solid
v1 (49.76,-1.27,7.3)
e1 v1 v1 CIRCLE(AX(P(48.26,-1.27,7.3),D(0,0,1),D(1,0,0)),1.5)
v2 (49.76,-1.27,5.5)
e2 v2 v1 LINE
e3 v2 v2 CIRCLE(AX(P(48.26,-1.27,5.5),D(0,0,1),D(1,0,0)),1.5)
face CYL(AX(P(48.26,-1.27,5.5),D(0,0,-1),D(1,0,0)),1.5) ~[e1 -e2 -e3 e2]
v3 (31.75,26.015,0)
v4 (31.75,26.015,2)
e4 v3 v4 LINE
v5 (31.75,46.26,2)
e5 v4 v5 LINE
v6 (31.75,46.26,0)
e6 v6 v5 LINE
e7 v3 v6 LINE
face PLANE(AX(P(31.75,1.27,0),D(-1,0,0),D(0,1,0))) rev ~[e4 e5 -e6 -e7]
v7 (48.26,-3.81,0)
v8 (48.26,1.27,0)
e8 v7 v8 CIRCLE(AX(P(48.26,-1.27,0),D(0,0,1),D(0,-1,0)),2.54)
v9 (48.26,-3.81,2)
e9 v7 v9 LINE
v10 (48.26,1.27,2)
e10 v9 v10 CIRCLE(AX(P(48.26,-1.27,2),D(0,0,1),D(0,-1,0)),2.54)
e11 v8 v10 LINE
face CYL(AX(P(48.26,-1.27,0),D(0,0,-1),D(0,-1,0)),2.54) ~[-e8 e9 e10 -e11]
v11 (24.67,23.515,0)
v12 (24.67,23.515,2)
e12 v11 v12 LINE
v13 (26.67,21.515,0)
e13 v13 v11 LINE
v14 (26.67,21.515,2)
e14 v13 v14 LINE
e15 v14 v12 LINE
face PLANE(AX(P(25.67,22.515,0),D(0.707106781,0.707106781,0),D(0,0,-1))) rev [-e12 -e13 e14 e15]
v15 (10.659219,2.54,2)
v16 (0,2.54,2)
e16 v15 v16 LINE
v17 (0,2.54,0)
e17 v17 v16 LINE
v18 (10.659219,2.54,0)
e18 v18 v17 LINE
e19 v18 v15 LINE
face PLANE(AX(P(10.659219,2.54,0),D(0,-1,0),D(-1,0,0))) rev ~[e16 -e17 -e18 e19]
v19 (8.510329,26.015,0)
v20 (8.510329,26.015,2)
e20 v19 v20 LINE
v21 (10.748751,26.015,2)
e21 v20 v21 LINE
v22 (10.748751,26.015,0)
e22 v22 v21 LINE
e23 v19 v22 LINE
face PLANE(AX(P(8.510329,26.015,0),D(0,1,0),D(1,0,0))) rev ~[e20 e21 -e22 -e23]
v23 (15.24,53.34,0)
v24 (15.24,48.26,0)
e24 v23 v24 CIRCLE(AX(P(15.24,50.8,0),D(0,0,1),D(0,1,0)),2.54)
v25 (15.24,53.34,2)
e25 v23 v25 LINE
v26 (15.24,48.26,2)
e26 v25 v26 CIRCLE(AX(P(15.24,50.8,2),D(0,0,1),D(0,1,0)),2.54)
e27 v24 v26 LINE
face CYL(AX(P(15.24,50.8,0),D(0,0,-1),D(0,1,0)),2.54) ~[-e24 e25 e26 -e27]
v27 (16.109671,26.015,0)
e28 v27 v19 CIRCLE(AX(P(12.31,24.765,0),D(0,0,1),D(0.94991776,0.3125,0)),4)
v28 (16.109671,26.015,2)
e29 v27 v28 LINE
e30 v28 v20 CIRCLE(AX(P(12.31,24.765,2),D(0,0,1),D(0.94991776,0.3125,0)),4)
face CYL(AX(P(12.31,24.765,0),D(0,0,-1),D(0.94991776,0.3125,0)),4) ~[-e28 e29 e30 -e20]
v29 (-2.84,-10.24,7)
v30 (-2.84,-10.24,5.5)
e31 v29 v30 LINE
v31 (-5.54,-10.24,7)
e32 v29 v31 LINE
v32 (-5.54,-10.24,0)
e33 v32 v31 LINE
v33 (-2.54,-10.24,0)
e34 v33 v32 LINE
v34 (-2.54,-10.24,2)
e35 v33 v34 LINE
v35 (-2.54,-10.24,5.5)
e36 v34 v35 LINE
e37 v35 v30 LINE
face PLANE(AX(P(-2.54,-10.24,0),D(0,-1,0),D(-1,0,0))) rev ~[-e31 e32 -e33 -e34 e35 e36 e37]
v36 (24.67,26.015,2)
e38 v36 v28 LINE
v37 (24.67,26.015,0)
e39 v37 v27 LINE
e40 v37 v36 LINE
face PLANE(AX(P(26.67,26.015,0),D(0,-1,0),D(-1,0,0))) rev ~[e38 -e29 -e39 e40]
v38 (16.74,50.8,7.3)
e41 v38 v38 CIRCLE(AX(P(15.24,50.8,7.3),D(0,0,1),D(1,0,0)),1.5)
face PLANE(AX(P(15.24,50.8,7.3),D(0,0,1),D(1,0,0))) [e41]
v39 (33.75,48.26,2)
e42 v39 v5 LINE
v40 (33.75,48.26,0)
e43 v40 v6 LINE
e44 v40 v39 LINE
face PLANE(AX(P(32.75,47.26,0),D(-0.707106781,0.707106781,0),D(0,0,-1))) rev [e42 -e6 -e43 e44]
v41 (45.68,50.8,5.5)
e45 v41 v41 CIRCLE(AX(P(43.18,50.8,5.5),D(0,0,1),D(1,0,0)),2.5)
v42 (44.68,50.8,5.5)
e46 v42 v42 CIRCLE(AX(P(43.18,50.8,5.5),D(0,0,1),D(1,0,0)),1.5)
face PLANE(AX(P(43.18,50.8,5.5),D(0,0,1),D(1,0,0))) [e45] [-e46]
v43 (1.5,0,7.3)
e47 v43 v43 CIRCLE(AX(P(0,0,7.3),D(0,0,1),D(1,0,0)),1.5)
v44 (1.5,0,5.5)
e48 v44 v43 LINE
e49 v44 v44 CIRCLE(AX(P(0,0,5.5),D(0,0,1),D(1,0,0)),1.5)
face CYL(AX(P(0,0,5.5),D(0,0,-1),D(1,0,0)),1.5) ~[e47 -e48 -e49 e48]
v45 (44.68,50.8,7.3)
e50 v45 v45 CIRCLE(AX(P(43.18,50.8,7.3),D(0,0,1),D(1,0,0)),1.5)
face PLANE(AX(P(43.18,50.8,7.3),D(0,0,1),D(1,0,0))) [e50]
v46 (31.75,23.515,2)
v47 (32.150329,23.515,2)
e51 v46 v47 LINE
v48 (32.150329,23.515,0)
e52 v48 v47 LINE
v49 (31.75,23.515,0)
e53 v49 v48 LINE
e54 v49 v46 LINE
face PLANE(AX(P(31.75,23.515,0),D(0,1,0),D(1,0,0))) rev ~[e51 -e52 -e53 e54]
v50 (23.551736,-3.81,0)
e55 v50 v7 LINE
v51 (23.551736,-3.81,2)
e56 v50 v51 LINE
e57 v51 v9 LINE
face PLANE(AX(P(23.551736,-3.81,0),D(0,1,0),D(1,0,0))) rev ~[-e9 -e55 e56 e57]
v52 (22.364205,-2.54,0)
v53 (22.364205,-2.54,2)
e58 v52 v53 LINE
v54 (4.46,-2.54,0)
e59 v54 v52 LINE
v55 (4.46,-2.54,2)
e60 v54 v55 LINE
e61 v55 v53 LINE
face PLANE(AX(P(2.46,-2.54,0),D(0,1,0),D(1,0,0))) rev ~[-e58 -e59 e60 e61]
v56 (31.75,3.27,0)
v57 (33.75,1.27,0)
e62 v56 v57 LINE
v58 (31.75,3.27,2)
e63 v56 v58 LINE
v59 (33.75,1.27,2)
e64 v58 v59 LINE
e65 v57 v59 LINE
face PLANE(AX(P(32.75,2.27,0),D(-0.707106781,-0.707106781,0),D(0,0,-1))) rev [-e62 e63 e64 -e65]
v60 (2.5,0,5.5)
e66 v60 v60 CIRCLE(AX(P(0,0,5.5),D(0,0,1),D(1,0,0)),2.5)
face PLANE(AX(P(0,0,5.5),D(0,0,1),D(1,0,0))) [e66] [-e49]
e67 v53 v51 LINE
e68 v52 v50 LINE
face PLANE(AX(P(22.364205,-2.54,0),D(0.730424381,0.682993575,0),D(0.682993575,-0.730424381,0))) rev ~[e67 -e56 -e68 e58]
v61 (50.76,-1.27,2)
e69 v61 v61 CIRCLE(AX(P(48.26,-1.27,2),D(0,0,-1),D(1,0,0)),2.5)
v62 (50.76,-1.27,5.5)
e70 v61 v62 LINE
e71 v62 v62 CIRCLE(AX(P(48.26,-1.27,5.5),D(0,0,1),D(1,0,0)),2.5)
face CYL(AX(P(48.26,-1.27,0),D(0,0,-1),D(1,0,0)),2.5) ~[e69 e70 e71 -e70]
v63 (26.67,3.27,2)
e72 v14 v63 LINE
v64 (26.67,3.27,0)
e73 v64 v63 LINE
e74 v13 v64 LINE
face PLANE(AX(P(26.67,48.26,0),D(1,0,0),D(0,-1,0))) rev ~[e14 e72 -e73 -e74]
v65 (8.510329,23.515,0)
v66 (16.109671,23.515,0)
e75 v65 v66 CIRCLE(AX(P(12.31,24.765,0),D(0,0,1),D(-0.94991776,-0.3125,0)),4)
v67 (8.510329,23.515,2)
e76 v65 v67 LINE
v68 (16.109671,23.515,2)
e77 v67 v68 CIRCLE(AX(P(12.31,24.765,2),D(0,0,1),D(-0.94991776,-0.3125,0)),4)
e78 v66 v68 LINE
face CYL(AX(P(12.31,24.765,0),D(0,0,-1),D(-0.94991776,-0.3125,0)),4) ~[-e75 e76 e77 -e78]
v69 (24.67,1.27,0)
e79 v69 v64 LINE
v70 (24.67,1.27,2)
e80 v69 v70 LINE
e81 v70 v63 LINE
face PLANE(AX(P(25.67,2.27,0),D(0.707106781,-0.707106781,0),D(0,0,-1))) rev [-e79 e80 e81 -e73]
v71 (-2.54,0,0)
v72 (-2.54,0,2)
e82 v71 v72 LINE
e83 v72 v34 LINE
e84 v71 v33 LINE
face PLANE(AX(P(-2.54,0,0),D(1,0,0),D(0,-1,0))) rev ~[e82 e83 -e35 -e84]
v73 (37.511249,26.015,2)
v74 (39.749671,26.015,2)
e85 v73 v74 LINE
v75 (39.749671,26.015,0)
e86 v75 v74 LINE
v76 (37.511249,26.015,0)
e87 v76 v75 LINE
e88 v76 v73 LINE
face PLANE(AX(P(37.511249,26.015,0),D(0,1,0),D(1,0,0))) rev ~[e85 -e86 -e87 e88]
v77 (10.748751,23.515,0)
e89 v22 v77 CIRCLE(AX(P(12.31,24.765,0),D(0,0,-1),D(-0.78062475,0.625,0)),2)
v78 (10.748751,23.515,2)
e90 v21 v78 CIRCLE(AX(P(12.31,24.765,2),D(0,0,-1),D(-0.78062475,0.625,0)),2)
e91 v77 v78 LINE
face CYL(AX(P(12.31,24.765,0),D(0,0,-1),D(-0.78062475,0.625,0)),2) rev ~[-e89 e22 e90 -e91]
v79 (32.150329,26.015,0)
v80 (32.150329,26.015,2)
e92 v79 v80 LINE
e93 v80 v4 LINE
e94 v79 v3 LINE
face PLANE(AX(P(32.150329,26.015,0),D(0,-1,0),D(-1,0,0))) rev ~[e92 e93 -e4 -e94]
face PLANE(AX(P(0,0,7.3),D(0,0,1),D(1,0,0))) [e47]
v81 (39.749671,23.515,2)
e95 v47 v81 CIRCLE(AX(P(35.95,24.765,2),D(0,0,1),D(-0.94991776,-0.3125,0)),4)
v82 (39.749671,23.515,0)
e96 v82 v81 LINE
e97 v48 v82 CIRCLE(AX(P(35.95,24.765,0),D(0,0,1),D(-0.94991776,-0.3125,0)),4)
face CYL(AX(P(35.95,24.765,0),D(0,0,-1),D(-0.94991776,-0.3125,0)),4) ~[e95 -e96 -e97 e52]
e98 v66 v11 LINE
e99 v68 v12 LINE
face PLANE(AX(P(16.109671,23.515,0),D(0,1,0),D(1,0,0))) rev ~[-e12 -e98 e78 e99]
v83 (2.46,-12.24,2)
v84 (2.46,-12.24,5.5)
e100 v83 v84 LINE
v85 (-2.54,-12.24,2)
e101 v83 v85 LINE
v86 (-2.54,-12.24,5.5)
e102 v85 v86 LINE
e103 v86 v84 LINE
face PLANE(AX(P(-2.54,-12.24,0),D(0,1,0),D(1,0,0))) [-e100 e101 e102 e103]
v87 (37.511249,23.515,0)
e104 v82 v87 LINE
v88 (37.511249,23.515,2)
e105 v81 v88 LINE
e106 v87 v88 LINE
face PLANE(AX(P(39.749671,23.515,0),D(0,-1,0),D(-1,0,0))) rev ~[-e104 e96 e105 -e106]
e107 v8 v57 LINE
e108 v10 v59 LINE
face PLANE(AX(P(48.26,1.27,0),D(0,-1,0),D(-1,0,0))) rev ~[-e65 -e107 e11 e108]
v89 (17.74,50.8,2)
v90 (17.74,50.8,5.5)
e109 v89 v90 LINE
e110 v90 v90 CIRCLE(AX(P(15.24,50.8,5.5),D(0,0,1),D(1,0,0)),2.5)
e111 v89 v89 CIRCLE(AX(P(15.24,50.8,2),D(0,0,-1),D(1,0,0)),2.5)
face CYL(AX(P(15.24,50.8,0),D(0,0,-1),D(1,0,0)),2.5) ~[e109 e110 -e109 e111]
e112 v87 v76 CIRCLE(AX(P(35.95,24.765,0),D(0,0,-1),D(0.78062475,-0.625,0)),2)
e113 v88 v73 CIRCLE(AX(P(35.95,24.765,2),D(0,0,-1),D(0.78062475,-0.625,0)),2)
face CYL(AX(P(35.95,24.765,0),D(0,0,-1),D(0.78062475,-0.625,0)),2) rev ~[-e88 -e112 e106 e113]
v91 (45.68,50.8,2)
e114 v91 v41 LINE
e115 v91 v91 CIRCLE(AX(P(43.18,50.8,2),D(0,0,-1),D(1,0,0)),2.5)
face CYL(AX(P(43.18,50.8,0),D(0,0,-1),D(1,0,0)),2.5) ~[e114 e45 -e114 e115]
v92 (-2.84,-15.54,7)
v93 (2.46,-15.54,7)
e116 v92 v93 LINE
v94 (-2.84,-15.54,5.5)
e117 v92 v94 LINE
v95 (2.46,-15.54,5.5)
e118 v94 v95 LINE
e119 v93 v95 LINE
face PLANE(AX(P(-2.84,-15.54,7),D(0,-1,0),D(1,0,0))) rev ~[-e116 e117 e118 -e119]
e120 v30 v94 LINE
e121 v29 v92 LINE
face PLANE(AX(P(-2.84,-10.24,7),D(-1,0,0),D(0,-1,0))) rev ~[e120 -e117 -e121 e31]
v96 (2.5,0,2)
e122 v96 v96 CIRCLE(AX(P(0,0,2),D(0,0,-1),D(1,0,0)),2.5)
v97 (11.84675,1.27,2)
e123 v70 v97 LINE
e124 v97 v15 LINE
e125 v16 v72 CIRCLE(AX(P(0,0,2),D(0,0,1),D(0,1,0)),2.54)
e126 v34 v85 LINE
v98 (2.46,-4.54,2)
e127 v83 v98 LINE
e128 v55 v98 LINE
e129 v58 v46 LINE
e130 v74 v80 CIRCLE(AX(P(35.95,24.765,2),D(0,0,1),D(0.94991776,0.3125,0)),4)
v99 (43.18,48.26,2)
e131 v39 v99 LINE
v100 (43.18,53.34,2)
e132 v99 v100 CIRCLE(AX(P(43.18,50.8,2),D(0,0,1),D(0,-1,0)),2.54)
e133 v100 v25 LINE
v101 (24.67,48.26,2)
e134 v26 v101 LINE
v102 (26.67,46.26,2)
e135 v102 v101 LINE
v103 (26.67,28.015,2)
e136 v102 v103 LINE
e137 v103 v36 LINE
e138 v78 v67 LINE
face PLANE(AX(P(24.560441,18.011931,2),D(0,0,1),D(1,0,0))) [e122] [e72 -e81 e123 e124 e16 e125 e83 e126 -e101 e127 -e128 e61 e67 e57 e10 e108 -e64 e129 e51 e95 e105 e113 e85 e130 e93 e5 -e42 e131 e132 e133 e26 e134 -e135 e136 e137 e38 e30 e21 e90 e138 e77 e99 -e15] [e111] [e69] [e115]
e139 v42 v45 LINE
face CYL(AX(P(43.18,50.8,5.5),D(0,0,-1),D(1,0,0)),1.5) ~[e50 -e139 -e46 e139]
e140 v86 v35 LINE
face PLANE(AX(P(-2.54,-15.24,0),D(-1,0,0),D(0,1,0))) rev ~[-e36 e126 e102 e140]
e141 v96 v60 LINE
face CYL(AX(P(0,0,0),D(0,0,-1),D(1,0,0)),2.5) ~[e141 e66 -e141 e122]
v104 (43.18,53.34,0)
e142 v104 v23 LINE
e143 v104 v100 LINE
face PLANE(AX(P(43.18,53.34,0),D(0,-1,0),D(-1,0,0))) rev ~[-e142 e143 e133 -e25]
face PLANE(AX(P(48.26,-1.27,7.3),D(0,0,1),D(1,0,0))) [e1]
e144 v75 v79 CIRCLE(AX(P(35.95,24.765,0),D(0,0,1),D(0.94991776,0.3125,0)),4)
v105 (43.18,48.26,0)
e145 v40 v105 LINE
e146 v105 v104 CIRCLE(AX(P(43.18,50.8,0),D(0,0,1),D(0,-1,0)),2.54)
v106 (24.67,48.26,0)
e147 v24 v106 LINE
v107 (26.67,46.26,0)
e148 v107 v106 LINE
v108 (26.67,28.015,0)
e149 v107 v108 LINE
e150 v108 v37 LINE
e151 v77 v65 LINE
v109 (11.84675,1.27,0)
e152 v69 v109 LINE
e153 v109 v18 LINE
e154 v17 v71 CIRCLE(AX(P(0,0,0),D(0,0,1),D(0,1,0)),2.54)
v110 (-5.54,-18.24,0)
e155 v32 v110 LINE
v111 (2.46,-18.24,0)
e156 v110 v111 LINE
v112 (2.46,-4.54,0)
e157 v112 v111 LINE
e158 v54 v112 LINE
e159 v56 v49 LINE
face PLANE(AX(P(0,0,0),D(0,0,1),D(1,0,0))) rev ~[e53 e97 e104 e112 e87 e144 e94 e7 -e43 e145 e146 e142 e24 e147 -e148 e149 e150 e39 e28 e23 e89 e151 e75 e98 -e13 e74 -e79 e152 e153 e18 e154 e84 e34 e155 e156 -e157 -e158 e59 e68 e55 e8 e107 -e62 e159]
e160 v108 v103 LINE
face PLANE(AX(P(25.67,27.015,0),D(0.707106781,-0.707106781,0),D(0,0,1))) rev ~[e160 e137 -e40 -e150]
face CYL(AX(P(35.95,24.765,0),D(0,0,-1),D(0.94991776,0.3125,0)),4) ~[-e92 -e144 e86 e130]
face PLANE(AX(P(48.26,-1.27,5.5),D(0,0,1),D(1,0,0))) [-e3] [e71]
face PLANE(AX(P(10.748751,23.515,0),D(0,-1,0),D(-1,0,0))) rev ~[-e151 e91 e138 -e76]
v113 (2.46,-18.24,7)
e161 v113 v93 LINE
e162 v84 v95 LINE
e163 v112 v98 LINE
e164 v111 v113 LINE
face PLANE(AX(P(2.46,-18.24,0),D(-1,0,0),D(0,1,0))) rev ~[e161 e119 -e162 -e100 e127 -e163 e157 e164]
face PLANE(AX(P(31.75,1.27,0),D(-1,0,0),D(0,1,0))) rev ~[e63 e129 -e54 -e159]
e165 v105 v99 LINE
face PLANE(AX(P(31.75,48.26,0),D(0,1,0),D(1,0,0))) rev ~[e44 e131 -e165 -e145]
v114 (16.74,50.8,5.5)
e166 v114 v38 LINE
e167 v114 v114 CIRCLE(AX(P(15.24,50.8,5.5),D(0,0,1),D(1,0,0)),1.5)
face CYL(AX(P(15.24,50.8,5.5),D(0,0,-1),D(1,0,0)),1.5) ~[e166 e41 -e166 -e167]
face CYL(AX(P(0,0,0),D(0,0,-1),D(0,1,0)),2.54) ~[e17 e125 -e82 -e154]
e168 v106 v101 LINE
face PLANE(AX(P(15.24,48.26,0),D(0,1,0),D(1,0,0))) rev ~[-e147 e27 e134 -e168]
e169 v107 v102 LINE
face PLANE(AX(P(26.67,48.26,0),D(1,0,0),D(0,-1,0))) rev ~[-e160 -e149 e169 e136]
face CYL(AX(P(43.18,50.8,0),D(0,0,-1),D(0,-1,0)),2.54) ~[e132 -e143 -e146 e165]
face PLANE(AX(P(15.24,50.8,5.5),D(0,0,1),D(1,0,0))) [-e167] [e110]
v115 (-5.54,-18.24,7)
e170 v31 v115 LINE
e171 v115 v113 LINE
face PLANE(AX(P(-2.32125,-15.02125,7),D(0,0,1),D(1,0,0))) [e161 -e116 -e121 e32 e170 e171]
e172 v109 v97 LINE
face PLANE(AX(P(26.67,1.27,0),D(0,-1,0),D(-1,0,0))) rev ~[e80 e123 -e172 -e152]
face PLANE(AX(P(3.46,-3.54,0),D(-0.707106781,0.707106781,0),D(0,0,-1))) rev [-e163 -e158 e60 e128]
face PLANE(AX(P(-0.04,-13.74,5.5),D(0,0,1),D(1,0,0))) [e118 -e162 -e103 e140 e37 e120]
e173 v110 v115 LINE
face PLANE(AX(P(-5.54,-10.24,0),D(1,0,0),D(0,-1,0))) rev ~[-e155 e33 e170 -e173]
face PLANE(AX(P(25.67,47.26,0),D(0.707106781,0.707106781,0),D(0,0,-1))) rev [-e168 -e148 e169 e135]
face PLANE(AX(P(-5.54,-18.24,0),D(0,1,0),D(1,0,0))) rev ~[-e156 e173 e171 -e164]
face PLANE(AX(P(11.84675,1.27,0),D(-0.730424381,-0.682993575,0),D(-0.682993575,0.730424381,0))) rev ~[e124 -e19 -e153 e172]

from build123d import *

# Parameters (mm, degrees)
F1_DEPTH  = 2
F3_DEPTH  = 7
F4_R      = 2.5
F4_W      = 5
F4_H      = 3
F5_DEPTH  = 5.5
F6_R      = 1.5
F7_DEPTH  = 1.8
F9_DEPTH  = 1.5
F10_SIZE  = 2
F12_DEPTH = 2
F13_SIZE  = 2


# Not quite as in the source:
# - a feature names something its author has since deleted; it is built from what else it names


with BuildPart() as f1:
    # F0 (on Top) → F1 (new body)
    with BuildSketch(Plane.XY):
        with BuildLine():
            Line((2.46, -15.24), (2.46, -2.54))
            Line((2.46, -2.54), (22.3642048012, -2.54))
            Line((22.3642048012, -2.54), (23.5517361372, -3.81))
            Line((23.5517361372, -3.81), (48.26, -3.81))
            ThreePointArc((48.26, -3.81), (50.8, -1.27), (48.26, 1.27))
            Line((48.26, 1.27), (31.75, 1.27))
            Line((31.75, 1.27), (31.75, 48.26))
            Line((31.75, 48.26), (43.18, 48.26))
            ThreePointArc((43.18, 48.26), (45.72, 50.8), (43.18, 53.34))
            Line((43.18, 53.34), (15.24, 53.34))
            ThreePointArc((15.24, 53.34), (12.7, 50.8), (15.24, 48.26))
            Line((15.24, 48.26), (26.67, 48.26))
            Line((26.67, 48.26), (26.67, 1.27))
            Line((26.67, 1.27), (11.8467498474, 1.27))
            Line((11.8467498474, 1.27), (10.6592185114, 2.54))
            Line((10.6592185114, 2.54), (0, 2.54))
            ThreePointArc((0, 2.54), (-1.7960512242, 1.7960512242), (-2.54, 0))
            Line((-2.54, 0), (-2.54, -15.24))
            Line((-2.54, -15.24), (2.46, -15.24))
        make_face()
    extrude(amount=F1_DEPTH)

    # F2 (on Top) → F3 (join)
    with BuildSketch(Plane.XY):
        Polygon((2.46, -18.24), (2.46, -15.24), (-2.54, -15.24), (-2.54, -10.24), (-5.54, -10.24), (-5.54, -18.24), align=None)
    extrude(amount=F3_DEPTH)

    # F4 (on Top) → F5 (join)
    with BuildSketch(Plane.XY):
        Circle(F4_R)
        with Locations((48.26, -1.27)):
            Circle(F4_R)
        with Locations((15.24, 50.8)):
            Circle(F4_R)
        with Locations((43.18, 50.8)):
            Circle(F4_R)
        with Locations((-0.04, -13.74)):
            Rectangle(F4_W, F4_H)
    extrude(amount=F5_DEPTH)

    # F6 (on face) → F7 (join)
    with BuildSketch(Plane.XY.offset(5.5)):
        Circle(F6_R)
        with Locations((48.26, -1.27)):
            Circle(F6_R)
        with Locations((15.24, 50.8)):
            Circle(F6_R)
        with Locations((43.18, 50.8)):
            Circle(F6_R)
    extrude(amount=F7_DEPTH)

    # F8 (on face) → F9 (cut)
    with BuildSketch(Plane.XY.offset(7)):
        Polygon((2.46, -15.24), (-2.54, -15.24), (-2.54, -10.24), (-2.84, -10.24), (-2.84, -15.54), (2.46, -15.54), align=None)
    extrude(amount=-F9_DEPTH, mode=Mode.SUBTRACT)

    # F10
    f10_edges = [f1.edges().sort_by_distance(p)[0] for p in [
        (31.75, 48.26, 1),
        (26.67, 48.26, 1),
        (26.67, 1.27, 1),
        (31.75, 1.27, 1),
        (2.46, -2.54, 1),
    ]]
    chamfer(f10_edges, length=F10_SIZE)

    # F11 (on Top) → F12 (join)
    with BuildSketch(Plane.XY):
        with BuildLine():
            ThreePointArc((37.5112494996, 23.515), (33.95, 24.765), (37.5112494996, 26.015))
            Line((37.5112494996, 26.015), (39.7496710384, 26.015))
            ThreePointArc((39.7496710384, 26.015), (35.95, 28.765), (32.1503289616, 26.015))
            ThreePointArc((32.1503289616, 26.015), (31.95, 24.765), (32.1503289616, 23.515))
            ThreePointArc((32.1503289616, 23.515), (35.95, 20.765), (39.7496710384, 23.515))
            Line((39.7496710384, 23.515), (37.5112494996, 23.515))
        make_face()
        with BuildLine():
            ThreePointArc((32.1503289616, 23.515), (31.95, 24.765), (32.1503289616, 26.015))
            Line((32.1503289616, 26.015), (31.75, 26.015))
            Line((31.75, 26.015), (31.75, 23.515))
            Line((31.75, 23.515), (32.1503289616, 23.515))
        make_face()
        with BuildLine():
            ThreePointArc((16.1096710384, 26.015), (12.31, 28.765), (8.5103289616, 26.015))
            Line((8.5103289616, 26.015), (10.7487505004, 26.015))
            ThreePointArc((10.7487505004, 26.015), (14.31, 24.765), (10.7487505004, 23.515))
            Line((10.7487505004, 23.515), (8.5103289616, 23.515))
            ThreePointArc((8.5103289616, 23.515), (12.31, 20.765), (16.1096710384, 23.515))
            ThreePointArc((16.1096710384, 23.515), (16.31, 24.765), (16.1096710384, 26.015))
        make_face()
        with BuildLine():
            Line((26.67, 26.015), (16.1096710384, 26.015))
            ThreePointArc((16.1096710384, 26.015), (16.31, 24.765), (16.1096710384, 23.515))
            Line((16.1096710384, 23.515), (26.67, 23.515))
            Line((26.67, 23.515), (26.67, 26.015))
        make_face()
    extrude(amount=F12_DEPTH)

    # F13
    f13_edges = [f1.edges().sort_by_distance(p)[0] for p in [
        (26.67, 23.515, 1),
        (26.67, 26.015, 1),
    ]]
    chamfer(f13_edges, length=F13_SIZE)


solid = f1.part
